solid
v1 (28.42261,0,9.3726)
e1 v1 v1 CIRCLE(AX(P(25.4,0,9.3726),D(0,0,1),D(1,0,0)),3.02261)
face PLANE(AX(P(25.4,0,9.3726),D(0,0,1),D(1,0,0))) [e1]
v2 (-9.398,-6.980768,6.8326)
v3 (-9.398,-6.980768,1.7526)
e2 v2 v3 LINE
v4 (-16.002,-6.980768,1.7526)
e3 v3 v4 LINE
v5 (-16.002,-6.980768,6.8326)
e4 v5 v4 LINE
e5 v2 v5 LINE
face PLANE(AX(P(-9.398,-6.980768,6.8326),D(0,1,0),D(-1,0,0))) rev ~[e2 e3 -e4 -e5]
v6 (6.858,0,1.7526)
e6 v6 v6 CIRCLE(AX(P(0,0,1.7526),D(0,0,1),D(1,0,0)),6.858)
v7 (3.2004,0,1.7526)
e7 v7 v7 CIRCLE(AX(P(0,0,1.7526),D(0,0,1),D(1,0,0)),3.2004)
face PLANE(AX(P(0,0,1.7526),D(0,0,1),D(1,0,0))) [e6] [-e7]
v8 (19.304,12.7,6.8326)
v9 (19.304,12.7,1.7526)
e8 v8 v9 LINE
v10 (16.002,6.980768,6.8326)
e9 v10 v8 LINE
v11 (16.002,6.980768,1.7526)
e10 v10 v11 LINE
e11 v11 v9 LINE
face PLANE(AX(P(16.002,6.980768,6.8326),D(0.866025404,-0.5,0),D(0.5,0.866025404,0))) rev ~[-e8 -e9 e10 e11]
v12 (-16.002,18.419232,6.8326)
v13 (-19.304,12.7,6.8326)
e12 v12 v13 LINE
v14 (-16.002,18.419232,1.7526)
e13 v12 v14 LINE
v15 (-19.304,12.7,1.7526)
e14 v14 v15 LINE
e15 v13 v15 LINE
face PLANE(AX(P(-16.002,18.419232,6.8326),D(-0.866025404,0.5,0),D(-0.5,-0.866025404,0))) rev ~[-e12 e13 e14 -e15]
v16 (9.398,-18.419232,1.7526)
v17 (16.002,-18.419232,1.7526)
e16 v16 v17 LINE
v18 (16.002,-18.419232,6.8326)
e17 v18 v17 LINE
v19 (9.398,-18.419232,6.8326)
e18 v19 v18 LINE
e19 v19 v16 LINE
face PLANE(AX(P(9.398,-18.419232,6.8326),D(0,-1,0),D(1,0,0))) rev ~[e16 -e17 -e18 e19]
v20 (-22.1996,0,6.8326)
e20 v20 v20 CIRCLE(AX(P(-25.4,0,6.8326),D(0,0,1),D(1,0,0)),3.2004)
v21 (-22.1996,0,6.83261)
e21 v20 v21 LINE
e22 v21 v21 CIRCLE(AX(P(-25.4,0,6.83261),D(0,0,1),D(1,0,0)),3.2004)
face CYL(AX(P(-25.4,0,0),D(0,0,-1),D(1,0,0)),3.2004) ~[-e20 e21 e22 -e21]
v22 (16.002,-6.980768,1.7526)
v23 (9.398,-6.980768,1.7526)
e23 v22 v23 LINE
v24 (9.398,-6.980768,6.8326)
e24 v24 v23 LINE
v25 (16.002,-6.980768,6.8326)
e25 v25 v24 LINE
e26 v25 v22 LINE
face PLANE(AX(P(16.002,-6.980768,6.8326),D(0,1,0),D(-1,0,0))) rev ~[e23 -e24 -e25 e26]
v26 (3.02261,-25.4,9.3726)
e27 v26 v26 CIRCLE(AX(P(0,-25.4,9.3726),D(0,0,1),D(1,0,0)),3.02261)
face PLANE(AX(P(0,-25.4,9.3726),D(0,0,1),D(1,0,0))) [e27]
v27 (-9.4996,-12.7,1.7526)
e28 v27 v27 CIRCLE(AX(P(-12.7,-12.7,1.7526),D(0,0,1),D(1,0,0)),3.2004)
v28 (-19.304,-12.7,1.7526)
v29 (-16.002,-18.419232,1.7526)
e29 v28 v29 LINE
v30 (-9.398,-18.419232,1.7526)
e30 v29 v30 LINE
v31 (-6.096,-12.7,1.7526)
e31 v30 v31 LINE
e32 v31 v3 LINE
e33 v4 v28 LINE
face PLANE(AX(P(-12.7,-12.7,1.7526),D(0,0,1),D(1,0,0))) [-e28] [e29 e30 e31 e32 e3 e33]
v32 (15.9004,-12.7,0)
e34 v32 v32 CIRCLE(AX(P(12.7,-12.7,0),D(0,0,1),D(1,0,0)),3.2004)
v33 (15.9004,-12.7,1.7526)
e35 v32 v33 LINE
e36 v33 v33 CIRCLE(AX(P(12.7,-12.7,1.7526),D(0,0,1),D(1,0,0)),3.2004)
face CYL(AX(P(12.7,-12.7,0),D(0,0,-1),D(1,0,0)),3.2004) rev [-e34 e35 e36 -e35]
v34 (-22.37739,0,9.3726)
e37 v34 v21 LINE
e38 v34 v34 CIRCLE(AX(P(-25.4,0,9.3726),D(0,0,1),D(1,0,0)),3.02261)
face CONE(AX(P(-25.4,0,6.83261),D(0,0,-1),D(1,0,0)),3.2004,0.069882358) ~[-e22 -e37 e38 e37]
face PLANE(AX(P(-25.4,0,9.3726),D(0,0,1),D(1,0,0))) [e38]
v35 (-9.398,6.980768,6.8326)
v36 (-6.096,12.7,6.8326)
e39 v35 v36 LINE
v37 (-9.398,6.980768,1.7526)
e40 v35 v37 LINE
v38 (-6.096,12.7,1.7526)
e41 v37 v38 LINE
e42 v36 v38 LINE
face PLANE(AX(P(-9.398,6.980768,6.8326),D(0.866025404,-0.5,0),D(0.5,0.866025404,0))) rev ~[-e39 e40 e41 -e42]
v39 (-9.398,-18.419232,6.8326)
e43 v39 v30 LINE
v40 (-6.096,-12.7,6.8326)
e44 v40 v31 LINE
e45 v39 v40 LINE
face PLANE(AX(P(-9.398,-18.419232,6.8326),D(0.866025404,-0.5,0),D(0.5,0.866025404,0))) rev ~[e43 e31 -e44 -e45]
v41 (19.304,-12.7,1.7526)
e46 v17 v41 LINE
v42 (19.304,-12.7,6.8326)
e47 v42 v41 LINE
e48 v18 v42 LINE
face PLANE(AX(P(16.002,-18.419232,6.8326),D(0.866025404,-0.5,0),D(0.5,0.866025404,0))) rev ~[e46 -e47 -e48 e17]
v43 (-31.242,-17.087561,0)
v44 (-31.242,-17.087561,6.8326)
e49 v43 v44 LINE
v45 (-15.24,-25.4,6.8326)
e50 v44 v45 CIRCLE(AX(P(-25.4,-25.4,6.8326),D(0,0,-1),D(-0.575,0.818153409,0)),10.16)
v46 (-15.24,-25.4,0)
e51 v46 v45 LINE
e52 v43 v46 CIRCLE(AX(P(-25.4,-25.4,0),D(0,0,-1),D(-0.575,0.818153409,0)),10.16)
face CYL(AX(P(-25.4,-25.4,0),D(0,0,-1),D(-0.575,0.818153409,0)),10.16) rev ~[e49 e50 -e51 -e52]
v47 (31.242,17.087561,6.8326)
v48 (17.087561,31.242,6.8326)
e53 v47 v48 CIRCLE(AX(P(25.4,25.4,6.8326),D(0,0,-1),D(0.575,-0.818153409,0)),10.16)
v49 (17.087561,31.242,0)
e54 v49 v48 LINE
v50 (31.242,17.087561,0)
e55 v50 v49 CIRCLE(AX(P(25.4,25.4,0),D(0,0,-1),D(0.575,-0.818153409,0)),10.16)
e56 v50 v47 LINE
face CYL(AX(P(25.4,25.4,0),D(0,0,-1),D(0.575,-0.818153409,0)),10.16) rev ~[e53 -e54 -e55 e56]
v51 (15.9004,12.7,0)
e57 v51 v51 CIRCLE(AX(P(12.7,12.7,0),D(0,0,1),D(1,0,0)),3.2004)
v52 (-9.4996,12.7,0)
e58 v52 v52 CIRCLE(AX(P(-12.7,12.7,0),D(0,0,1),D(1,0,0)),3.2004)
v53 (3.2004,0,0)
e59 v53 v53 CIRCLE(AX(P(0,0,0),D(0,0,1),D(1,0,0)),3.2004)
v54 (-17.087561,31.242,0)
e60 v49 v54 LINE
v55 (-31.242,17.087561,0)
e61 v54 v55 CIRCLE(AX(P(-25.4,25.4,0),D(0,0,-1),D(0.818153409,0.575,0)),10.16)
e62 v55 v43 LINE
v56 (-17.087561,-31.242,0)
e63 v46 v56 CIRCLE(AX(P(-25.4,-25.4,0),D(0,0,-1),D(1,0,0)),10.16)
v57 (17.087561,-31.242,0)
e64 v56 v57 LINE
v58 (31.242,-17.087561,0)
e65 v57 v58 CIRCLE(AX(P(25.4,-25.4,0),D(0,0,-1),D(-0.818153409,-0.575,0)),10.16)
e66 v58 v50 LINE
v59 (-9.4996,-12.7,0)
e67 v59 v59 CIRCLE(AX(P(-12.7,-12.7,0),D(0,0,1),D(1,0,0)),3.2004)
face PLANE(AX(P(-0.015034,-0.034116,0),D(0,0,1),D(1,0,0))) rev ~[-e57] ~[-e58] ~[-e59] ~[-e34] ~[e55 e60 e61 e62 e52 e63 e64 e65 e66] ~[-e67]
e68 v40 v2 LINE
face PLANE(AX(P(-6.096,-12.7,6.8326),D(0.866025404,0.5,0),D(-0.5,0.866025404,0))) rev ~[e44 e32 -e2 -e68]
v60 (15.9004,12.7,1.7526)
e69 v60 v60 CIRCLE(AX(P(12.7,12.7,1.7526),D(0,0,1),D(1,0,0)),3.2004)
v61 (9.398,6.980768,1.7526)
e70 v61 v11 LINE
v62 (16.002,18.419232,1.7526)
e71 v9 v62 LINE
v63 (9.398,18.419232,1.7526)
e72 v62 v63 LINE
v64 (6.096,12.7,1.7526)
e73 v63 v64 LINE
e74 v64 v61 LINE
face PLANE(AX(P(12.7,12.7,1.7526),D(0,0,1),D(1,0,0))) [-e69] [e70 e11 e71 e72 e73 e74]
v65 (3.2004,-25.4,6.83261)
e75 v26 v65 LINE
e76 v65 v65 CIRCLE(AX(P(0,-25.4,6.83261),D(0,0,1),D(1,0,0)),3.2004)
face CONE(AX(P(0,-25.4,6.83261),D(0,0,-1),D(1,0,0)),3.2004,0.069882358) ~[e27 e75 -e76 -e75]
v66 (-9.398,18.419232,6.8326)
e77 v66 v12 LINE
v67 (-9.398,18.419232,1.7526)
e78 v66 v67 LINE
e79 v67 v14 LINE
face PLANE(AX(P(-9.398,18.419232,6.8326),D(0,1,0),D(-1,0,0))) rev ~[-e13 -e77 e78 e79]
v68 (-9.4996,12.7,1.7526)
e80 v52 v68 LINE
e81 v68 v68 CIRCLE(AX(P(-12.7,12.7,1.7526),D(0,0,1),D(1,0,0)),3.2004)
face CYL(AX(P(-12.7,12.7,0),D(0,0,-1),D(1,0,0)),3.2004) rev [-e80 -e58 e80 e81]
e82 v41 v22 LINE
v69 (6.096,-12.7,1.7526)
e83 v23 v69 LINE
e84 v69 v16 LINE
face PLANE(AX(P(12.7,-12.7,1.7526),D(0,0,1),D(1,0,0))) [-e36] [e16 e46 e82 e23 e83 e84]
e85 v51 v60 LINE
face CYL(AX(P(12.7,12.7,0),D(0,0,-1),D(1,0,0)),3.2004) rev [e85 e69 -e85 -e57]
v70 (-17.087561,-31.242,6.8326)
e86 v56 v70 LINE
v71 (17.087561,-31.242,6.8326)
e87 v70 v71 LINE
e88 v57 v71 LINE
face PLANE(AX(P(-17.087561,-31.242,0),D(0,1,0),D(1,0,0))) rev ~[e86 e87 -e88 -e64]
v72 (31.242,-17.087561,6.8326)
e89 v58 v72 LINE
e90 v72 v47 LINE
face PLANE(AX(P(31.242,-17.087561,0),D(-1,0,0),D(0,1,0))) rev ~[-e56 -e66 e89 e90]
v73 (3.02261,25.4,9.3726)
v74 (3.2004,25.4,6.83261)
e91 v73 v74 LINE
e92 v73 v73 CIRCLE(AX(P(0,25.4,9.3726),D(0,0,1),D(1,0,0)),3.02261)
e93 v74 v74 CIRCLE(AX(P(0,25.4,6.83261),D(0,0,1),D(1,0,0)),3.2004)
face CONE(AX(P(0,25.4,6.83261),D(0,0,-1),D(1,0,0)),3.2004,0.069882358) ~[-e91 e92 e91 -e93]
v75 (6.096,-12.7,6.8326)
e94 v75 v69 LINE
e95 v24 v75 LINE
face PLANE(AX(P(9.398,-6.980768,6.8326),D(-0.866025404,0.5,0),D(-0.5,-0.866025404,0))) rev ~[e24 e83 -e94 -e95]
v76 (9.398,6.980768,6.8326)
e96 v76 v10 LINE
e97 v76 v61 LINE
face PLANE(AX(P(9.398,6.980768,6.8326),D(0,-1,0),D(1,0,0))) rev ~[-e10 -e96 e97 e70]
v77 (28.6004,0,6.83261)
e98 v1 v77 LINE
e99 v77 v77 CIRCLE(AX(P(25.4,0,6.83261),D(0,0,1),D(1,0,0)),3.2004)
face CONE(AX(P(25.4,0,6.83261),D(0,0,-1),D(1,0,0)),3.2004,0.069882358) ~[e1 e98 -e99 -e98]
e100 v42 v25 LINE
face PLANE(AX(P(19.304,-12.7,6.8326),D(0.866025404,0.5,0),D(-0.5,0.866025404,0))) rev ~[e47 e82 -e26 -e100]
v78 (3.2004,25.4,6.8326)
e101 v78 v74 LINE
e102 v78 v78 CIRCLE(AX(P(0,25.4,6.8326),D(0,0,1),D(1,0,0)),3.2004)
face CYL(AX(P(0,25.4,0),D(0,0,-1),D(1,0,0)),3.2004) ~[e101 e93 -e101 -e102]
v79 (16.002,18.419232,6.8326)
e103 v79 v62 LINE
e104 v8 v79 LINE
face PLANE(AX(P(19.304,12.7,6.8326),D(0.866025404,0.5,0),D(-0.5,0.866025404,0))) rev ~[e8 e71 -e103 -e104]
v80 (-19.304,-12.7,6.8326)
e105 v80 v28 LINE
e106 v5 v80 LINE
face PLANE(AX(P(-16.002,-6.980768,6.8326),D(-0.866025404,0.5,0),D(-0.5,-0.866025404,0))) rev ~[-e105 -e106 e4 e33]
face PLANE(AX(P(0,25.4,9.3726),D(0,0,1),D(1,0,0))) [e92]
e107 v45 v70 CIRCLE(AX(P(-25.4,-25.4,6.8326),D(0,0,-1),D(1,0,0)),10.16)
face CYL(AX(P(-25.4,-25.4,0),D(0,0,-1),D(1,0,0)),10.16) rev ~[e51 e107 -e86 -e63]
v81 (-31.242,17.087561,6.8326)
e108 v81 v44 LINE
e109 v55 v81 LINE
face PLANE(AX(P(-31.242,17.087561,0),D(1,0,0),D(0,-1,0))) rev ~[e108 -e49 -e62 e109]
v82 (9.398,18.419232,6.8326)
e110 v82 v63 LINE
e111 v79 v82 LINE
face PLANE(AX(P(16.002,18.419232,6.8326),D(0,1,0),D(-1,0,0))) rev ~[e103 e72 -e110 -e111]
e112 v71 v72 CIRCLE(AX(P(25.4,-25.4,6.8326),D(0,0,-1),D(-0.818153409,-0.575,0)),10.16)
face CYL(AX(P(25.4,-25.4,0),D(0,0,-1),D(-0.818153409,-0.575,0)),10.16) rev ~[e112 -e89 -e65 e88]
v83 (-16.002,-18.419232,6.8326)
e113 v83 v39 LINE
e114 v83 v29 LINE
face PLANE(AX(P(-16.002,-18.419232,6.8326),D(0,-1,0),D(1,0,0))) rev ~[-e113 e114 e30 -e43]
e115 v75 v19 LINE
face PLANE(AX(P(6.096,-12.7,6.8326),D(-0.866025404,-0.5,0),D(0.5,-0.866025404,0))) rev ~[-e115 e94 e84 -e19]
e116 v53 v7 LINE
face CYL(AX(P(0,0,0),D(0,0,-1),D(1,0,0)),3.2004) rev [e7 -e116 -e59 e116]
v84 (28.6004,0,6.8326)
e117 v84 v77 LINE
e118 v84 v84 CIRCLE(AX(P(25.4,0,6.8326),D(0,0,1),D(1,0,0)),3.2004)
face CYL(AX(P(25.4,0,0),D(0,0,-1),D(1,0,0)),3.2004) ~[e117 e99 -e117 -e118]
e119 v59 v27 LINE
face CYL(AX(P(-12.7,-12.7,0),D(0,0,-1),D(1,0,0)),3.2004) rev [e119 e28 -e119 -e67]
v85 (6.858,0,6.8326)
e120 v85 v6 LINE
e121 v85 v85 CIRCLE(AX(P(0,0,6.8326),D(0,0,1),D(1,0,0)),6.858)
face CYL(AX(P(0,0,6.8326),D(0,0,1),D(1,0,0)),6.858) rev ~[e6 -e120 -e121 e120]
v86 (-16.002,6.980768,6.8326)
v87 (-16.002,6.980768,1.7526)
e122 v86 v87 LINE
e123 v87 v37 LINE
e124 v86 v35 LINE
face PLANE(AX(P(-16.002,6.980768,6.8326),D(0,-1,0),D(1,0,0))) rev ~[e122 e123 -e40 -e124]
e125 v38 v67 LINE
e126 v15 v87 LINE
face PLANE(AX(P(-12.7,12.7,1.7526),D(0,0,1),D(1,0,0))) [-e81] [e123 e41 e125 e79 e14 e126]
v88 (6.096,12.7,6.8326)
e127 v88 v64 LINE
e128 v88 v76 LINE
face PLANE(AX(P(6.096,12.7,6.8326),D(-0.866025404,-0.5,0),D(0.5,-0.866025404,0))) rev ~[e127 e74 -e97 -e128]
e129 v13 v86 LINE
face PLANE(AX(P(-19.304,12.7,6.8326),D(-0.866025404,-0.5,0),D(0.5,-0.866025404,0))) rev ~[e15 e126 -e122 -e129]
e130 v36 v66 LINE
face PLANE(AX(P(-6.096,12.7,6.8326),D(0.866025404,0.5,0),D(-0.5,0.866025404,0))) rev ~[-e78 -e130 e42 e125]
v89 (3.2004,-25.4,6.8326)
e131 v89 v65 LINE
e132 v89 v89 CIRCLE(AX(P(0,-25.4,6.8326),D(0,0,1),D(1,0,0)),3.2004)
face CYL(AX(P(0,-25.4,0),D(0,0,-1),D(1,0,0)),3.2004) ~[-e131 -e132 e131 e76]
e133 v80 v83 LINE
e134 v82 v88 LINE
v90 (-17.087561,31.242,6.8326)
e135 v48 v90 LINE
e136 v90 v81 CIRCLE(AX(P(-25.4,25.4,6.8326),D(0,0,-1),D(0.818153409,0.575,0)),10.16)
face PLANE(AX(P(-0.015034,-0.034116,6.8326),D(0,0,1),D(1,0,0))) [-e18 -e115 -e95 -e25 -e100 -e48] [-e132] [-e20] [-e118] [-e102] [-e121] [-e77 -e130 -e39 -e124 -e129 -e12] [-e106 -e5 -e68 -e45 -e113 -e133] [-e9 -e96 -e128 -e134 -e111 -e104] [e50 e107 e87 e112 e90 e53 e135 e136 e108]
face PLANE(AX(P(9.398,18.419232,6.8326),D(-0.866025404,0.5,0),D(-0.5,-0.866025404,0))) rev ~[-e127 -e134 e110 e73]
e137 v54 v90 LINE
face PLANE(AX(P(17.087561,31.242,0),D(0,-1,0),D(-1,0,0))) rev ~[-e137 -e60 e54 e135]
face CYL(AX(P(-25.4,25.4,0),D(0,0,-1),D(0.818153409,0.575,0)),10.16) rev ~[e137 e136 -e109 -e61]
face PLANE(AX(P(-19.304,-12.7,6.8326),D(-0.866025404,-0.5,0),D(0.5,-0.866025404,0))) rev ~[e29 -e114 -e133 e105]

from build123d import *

# Parameters (mm, degrees)
F0_R       = 3.2004
F0_R_2     = 6.858
F1_DEPTH   = 6.8326
F2_DEPTH   = 9.3726
F3_R       = 3.2004
F3_R_2     = 6.858
F4_DEPTH   = 5.08
F5_SIZE2   = 2.53999
F5_SIZE    = 0.17779
F5_2_SIZE2 = 2.53999
F5_2_SIZE  = 0.17779
F5_3_SIZE2 = 2.53999
F5_3_SIZE  = 0.17779
F5_4_SIZE2 = 2.53999
F5_4_SIZE  = 0.17779


# Not quite as in the source:
# - a fillet or chamfer is up to 0.001 mm smaller than in the source, because OpenCascade refuses the exact size


with BuildPart() as f1:
    # F0 (on Top) → F1 (new body)
    with BuildSketch(Plane.XY):
        with BuildLine():
            ThreePointArc((-31.242, -17.0875613686), (-20.7164714157, -16.3838944106), (-15.24, -25.4))
            ThreePointArc((-15.24, -25.4), (-15.712895776, -28.4635945803), (-17.0875613686, -31.242))
            Line((-17.0875613686, -31.242), (17.0875613686, -31.242))
            ThreePointArc((17.0875613686, -31.242), (18.2157951031, -18.2157951031), (31.242, -17.0875613686))
            Line((31.242, -17.0875613686), (31.242, 17.0875613686))
            ThreePointArc((31.242, 17.0875613686), (18.2157951031, 18.2157951031), (17.0875613686, 31.242))
            Line((17.0875613686, 31.242), (-17.0875613686, 31.242))
            ThreePointArc((-17.0875613686, 31.242), (-18.2157951031, 18.2157951031), (-31.242, 17.0875613686))
            Line((-31.242, 17.0875613686), (-31.242, -17.0875613686))
        make_face()
        with Locations((0, -25.4)):
            Circle(F0_R, mode=Mode.SUBTRACT)
        with Locations((-25.4, 0)):
            Circle(F0_R, mode=Mode.SUBTRACT)
        with Locations((-12.7, -12.7)):
            Circle(F0_R, mode=Mode.SUBTRACT)
        Circle(F0_R_2, mode=Mode.SUBTRACT)
        with Locations((12.7, -12.7)):
            Circle(F0_R, mode=Mode.SUBTRACT)
        with Locations((25.4, 0)):
            Circle(F0_R, mode=Mode.SUBTRACT)
        with Locations((-12.7, 12.7)):
            Circle(F0_R, mode=Mode.SUBTRACT)
        with Locations((0, 25.4)):
            Circle(F0_R, mode=Mode.SUBTRACT)
        with Locations((12.7, 12.7)):
            Circle(F0_R, mode=Mode.SUBTRACT)
        Circle(F0_R_2)
        Circle(F0_R, mode=Mode.SUBTRACT)
    extrude(amount=F1_DEPTH)

    # F0 (on Top) → F2 (join)
    with BuildSketch(Plane.XY):
        with Locations((-25.4, 0)):
            Circle(F0_R)
        with Locations((0, -25.4)):
            Circle(F0_R)
        with Locations((25.4, 0)):
            Circle(F0_R)
        with Locations((0, 25.4)):
            Circle(F0_R)
    extrude(amount=F2_DEPTH)

    # F3 (on face) → F4 (cut)
    with BuildSketch(Plane.XY.offset(6.8326)):
        Polygon((-9.398, 6.9807682334), (-6.096, 12.7), (-9.398, 18.4192317666), (-16.002, 18.4192317666), (-19.304, 12.7), (-16.002, 6.9807682334), align=None)
        with Locations((-12.7, 12.7)):
            Circle(F3_R, mode=Mode.SUBTRACT)
        Polygon((9.398, 18.4192317666), (6.096, 12.7), (9.398, 6.9807682334), (16.002, 6.9807682334), (19.304, 12.7), (16.002, 18.4192317666), align=None)
        with Locations((12.7, 12.7)):
            Circle(F3_R, mode=Mode.SUBTRACT)
        Polygon((-9.398, -18.4192317666), (-6.096, -12.7), (-9.398, -6.9807682334), (-16.002, -6.9807682334), (-19.304, -12.7), (-16.002, -18.4192317666), align=None)
        with Locations((-12.7, -12.7)):
            Circle(F3_R, mode=Mode.SUBTRACT)
        Polygon((9.398, -6.9807682334), (6.096, -12.7), (9.398, -18.4192317666), (16.002, -18.4192317666), (19.304, -12.7), (16.002, -6.9807682334), align=None)
        with Locations((12.7, -12.7)):
            Circle(F3_R, mode=Mode.SUBTRACT)
        Circle(F3_R_2)
        Circle(F3_R, mode=Mode.SUBTRACT)
    extrude(amount=-F4_DEPTH, mode=Mode.SUBTRACT)

    # F5 (size 0.1778 and 2.54 in the source; OpenCascade refuses exactly that, so slightly less here)
    f5_edges = [f1.edges().sort_by_distance(p)[0] for p in [
        (-28.6004, 0, 9.3726),
    ]]
    f5_side = f1.faces().sort_by_distance((-25.4, 0, 9.3726))[0]
    chamfer(f5_edges, length=F5_SIZE, length2=F5_SIZE2, reference=f5_side)

    # F5#2 (size 0.1778 and 2.54 in the source; OpenCascade refuses exactly that, so slightly less here)
    f5_2_edges = [f1.edges().sort_by_distance(p)[0] for p in [
        (-3.2004, 25.4, 9.3726),
    ]]
    f5_2_side = f1.faces().sort_by_distance((0, 25.4, 9.3726))[0]
    chamfer(f5_2_edges, length=F5_2_SIZE, length2=F5_2_SIZE2, reference=f5_2_side)

    # F5#3 (size 0.1778 and 2.54 in the source; OpenCascade refuses exactly that, so slightly less here)
    f5_3_edges = [f1.edges().sort_by_distance(p)[0] for p in [
        (22.1996, 0, 9.3726),
    ]]
    f5_3_side = f1.faces().sort_by_distance((25.4, 0, 9.3726))[0]
    chamfer(f5_3_edges, length=F5_3_SIZE, length2=F5_3_SIZE2, reference=f5_3_side)

    # F5#4 (size 0.1778 and 2.54 in the source; OpenCascade refuses exactly that, so slightly less here)
    f5_4_edges = [f1.edges().sort_by_distance(p)[0] for p in [
        (-3.2004, -25.4, 9.3726),
    ]]
    f5_4_side = f1.faces().sort_by_distance((0, -25.4, 9.3726))[0]
    chamfer(f5_4_edges, length=F5_4_SIZE, length2=F5_4_SIZE2, reference=f5_4_side)


solid = f1.part
